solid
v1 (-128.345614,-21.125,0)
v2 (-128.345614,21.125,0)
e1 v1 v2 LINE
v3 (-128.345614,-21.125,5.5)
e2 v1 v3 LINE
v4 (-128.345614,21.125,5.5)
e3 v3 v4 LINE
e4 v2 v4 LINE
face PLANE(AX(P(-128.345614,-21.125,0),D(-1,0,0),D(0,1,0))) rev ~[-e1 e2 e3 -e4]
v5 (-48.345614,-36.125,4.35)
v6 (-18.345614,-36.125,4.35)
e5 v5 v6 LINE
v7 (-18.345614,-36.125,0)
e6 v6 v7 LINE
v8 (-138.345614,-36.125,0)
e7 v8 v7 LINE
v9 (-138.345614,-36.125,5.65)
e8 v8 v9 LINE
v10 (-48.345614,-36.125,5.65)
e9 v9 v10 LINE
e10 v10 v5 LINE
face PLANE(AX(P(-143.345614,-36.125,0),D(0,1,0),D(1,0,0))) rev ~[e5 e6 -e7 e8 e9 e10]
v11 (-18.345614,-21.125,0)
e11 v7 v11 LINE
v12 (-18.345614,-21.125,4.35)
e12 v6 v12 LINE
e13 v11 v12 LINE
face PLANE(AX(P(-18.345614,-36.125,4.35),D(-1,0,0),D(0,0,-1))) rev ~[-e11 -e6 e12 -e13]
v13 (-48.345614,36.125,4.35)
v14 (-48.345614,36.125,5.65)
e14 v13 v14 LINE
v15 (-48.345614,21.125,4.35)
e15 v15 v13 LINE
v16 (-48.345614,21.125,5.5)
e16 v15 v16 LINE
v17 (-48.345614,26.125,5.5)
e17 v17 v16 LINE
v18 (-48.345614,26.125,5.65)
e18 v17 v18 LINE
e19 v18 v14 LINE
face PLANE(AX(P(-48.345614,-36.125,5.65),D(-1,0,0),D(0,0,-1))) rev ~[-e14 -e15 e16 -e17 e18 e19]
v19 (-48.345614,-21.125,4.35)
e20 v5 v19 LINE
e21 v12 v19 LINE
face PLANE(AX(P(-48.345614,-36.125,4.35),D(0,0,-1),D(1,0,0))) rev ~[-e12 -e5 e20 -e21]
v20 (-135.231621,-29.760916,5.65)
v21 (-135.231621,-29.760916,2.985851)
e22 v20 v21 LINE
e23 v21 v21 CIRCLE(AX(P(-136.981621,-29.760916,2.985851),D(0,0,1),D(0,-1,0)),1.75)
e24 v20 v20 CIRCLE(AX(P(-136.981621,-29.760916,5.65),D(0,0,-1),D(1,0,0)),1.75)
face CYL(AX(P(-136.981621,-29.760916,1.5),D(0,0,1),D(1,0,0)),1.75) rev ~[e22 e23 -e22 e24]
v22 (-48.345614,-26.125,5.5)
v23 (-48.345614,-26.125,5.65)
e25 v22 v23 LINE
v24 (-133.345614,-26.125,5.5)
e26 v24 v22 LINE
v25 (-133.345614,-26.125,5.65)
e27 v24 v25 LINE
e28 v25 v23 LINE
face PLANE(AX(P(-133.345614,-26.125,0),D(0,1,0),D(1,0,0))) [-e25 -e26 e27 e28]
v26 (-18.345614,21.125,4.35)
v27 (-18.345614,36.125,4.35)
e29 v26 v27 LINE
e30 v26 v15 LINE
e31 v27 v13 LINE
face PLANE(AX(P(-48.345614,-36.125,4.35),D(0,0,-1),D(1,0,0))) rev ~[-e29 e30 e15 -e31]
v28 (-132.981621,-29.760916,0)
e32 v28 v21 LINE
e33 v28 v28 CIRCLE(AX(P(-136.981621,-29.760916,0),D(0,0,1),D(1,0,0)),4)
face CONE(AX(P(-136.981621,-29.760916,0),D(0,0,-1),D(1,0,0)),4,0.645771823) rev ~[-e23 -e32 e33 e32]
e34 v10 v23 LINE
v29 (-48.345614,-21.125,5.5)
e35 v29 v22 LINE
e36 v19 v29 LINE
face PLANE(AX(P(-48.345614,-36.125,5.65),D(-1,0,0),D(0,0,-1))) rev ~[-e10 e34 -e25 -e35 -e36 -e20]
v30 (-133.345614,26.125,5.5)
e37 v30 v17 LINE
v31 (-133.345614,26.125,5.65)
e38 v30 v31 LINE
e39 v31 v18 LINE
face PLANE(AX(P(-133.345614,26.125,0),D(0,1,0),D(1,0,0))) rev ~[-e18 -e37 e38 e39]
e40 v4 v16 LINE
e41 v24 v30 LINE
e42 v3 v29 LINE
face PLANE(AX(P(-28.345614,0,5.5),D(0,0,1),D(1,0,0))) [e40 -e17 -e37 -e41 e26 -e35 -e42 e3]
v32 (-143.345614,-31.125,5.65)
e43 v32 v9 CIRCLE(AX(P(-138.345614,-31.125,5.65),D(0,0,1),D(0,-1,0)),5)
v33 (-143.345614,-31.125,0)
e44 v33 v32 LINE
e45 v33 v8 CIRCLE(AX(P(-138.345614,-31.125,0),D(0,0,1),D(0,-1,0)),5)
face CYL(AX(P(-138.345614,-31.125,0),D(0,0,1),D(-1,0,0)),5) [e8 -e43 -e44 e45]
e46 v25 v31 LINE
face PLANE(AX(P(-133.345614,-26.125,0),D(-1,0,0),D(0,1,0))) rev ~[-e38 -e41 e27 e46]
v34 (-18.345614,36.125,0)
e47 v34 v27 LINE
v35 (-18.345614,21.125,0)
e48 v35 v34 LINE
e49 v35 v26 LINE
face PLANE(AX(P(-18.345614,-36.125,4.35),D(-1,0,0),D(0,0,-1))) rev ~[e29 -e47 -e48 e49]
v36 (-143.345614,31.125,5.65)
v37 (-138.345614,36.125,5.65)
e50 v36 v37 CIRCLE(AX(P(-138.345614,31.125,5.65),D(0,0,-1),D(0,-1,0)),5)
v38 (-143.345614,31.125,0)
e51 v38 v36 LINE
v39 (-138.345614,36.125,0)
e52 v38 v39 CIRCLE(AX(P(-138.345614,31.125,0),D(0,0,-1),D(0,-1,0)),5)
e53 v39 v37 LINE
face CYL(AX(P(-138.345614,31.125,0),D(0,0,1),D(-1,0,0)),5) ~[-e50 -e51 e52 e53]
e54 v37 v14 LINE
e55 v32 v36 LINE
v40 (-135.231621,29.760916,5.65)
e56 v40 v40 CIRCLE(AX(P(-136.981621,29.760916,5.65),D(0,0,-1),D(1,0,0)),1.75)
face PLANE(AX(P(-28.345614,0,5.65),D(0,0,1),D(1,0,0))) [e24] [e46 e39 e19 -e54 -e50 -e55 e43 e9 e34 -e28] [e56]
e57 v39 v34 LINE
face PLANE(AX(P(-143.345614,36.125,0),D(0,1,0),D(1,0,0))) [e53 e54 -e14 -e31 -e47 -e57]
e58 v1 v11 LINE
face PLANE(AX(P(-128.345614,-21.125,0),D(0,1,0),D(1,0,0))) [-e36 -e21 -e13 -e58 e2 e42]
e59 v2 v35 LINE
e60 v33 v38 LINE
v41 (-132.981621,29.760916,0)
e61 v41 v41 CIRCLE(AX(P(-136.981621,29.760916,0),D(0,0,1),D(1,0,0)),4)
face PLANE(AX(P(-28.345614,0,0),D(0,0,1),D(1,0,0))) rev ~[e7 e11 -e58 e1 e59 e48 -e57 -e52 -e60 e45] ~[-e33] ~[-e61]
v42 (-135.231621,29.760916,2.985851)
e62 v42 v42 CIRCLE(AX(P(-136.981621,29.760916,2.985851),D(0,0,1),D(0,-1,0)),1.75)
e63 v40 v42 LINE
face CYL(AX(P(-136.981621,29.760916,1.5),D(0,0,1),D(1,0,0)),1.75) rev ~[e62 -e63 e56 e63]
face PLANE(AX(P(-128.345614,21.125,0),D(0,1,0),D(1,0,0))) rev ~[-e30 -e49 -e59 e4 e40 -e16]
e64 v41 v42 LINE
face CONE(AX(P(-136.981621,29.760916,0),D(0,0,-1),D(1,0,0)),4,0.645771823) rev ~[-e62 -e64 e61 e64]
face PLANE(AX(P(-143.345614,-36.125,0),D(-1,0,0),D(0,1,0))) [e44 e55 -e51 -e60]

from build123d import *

# Parameters (mm, degrees)
F0_W         = 210
F0_H         = 52.25
F0_W_2       = 200
F0_H_2       = 42.25
F1_DEPTH     = 5.5
F0_W_3       = 230
F0_H_3       = 72.25
F2_DEPTH     = 5.65
F4_DEPTH     = 100
F5_R         = 5
F6_R         = 1.75
F7_DEPTH     = 25
F6_R_2       = 4
F8_DEPTH     = 3
F9_S6_R      = 1.75
F9_T7_DEPTH  = 7
F9_S13_R     = 1.75
F9_T14_DEPTH = 7


# Not quite as in the source:
# - a fillet or chamfer that OpenCascade refuses, or shapes differently, is made with other operations: its cross-section is extruded or revolved along the edge and cut away or added


with BuildPart() as f1:
    # F0 (on Top) → F1 (new body)
    with BuildSketch(Plane.XY):
        with Locations((-28.3456140757, 0)):
            Rectangle(F0_W, F0_H)
        with Locations((-28.3456140757, 0)):
            Rectangle(F0_W_2, F0_H_2, mode=Mode.SUBTRACT)
    extrude(amount=F1_DEPTH)

    # F0 (on Top) → F2 (join)
    with BuildSketch(Plane.XY):
        with Locations((-28.3456140757, 0)):
            Rectangle(F0_W_3, F0_H_3)
        with Locations((-28.3456140757, 0)):
            Rectangle(F0_W, F0_H, mode=Mode.SUBTRACT)
    extrude(amount=F2_DEPTH)

    # F3 (on face) → F4 (cut)
    with BuildSketch(Plane.XZ.offset(36.125)):
        Polygon((-48.3456140757, 5.65), (-48.3456140757, 4.35), (-18.3456140757, 4.35), (-18.3456140757, 0), (86.6543859243, 0), (86.6543859243, 5.65), align=None)
    extrude(amount=-F4_DEPTH, mode=Mode.SUBTRACT)

    # F5
    f5_edges = [f1.edges().sort_by_distance(p)[0] for p in [
        (-143.345614, 36.125, 2.825),
        (-143.345614, -36.125, 2.825),
    ]]
    fillet(f5_edges, radius=F5_R)

    # F6 (on face) → F7 (cut)
    with BuildSketch(Plane.XY):
        with Locations((-136.9816213846, 29.760915786)):
            Circle(F6_R)
        with Locations((-136.9816213846, -29.760915786)):
            Circle(F6_R)
    extrude(amount=F7_DEPTH, mode=Mode.SUBTRACT)

    # F6 (on face) → F8 (cut)
    with BuildSketch(Plane.XY):
        with Locations((-136.9816213846, -29.760915786)):
            Circle(F6_R_2)
        with Locations((-136.9816213846, -29.760915786)):
            Circle(F6_R, mode=Mode.SUBTRACT)
        with Locations((-136.9816213846, 29.760915786)):
            Circle(F6_R_2)
        with Locations((-136.9816213846, 29.760915786)):
            Circle(F6_R, mode=Mode.SUBTRACT)
    extrude(amount=F8_DEPTH, mode=Mode.SUBTRACT)

    # F9: chamfer of 3 x 2.2606621503 on 2 edges, made by hand


with BuildPart() as f9_tool2:
    # F9_s3 → F9_t4 (revolve)
    with BuildSketch(Plane.XZ.offset(-29.760915786)):
        Polygon((-132.9816213846, 0), (-135.2422835349, 3), (-132.9816213846, 3), align=None)
    revolve(axis=Axis((-136.9816213846, 29.760915786, 3), (0, 0, 1)))

    split(bisect_by=Plane.XY, keep=Keep.TOP)

    # F9_s6 → F9_t7 (cut, symmetric)
    with BuildSketch(Plane.XY.offset(1.5)):
        with Locations((-136.9816213846, 29.760915786)):
            Circle(F9_S6_R)
    extrude(amount=F9_T7_DEPTH, both=True, mode=Mode.SUBTRACT)


with BuildPart() as f1_1:
    add(f1.part)

    # F9_t1: union F9_tool2
    add(f9_tool2.part)


with BuildPart() as f9_tool9:
    # F9_s10 → F9_t11 (revolve)
    with BuildSketch(Plane.XZ.offset(29.760915786)):
        Polygon((-132.9816213846, 0), (-135.2422835349, 3), (-132.9816213846, 3), align=None)
    revolve(axis=Axis((-136.9816213846, -29.760915786, 3), (0, 0, 1)))

    split(bisect_by=Plane.XY, keep=Keep.TOP)

    # F9_s13 → F9_t14 (cut, symmetric)
    with BuildSketch(Plane.XY.offset(1.5)):
        with Locations((-136.9816213846, -29.760915786)):
            Circle(F9_S13_R)
    extrude(amount=F9_T14_DEPTH, both=True, mode=Mode.SUBTRACT)


with BuildPart() as f1_2:
    add(f1_1.part)

    # F9_t8: union F9_tool9
    add(f9_tool9.part)


solid = f1_2.part
